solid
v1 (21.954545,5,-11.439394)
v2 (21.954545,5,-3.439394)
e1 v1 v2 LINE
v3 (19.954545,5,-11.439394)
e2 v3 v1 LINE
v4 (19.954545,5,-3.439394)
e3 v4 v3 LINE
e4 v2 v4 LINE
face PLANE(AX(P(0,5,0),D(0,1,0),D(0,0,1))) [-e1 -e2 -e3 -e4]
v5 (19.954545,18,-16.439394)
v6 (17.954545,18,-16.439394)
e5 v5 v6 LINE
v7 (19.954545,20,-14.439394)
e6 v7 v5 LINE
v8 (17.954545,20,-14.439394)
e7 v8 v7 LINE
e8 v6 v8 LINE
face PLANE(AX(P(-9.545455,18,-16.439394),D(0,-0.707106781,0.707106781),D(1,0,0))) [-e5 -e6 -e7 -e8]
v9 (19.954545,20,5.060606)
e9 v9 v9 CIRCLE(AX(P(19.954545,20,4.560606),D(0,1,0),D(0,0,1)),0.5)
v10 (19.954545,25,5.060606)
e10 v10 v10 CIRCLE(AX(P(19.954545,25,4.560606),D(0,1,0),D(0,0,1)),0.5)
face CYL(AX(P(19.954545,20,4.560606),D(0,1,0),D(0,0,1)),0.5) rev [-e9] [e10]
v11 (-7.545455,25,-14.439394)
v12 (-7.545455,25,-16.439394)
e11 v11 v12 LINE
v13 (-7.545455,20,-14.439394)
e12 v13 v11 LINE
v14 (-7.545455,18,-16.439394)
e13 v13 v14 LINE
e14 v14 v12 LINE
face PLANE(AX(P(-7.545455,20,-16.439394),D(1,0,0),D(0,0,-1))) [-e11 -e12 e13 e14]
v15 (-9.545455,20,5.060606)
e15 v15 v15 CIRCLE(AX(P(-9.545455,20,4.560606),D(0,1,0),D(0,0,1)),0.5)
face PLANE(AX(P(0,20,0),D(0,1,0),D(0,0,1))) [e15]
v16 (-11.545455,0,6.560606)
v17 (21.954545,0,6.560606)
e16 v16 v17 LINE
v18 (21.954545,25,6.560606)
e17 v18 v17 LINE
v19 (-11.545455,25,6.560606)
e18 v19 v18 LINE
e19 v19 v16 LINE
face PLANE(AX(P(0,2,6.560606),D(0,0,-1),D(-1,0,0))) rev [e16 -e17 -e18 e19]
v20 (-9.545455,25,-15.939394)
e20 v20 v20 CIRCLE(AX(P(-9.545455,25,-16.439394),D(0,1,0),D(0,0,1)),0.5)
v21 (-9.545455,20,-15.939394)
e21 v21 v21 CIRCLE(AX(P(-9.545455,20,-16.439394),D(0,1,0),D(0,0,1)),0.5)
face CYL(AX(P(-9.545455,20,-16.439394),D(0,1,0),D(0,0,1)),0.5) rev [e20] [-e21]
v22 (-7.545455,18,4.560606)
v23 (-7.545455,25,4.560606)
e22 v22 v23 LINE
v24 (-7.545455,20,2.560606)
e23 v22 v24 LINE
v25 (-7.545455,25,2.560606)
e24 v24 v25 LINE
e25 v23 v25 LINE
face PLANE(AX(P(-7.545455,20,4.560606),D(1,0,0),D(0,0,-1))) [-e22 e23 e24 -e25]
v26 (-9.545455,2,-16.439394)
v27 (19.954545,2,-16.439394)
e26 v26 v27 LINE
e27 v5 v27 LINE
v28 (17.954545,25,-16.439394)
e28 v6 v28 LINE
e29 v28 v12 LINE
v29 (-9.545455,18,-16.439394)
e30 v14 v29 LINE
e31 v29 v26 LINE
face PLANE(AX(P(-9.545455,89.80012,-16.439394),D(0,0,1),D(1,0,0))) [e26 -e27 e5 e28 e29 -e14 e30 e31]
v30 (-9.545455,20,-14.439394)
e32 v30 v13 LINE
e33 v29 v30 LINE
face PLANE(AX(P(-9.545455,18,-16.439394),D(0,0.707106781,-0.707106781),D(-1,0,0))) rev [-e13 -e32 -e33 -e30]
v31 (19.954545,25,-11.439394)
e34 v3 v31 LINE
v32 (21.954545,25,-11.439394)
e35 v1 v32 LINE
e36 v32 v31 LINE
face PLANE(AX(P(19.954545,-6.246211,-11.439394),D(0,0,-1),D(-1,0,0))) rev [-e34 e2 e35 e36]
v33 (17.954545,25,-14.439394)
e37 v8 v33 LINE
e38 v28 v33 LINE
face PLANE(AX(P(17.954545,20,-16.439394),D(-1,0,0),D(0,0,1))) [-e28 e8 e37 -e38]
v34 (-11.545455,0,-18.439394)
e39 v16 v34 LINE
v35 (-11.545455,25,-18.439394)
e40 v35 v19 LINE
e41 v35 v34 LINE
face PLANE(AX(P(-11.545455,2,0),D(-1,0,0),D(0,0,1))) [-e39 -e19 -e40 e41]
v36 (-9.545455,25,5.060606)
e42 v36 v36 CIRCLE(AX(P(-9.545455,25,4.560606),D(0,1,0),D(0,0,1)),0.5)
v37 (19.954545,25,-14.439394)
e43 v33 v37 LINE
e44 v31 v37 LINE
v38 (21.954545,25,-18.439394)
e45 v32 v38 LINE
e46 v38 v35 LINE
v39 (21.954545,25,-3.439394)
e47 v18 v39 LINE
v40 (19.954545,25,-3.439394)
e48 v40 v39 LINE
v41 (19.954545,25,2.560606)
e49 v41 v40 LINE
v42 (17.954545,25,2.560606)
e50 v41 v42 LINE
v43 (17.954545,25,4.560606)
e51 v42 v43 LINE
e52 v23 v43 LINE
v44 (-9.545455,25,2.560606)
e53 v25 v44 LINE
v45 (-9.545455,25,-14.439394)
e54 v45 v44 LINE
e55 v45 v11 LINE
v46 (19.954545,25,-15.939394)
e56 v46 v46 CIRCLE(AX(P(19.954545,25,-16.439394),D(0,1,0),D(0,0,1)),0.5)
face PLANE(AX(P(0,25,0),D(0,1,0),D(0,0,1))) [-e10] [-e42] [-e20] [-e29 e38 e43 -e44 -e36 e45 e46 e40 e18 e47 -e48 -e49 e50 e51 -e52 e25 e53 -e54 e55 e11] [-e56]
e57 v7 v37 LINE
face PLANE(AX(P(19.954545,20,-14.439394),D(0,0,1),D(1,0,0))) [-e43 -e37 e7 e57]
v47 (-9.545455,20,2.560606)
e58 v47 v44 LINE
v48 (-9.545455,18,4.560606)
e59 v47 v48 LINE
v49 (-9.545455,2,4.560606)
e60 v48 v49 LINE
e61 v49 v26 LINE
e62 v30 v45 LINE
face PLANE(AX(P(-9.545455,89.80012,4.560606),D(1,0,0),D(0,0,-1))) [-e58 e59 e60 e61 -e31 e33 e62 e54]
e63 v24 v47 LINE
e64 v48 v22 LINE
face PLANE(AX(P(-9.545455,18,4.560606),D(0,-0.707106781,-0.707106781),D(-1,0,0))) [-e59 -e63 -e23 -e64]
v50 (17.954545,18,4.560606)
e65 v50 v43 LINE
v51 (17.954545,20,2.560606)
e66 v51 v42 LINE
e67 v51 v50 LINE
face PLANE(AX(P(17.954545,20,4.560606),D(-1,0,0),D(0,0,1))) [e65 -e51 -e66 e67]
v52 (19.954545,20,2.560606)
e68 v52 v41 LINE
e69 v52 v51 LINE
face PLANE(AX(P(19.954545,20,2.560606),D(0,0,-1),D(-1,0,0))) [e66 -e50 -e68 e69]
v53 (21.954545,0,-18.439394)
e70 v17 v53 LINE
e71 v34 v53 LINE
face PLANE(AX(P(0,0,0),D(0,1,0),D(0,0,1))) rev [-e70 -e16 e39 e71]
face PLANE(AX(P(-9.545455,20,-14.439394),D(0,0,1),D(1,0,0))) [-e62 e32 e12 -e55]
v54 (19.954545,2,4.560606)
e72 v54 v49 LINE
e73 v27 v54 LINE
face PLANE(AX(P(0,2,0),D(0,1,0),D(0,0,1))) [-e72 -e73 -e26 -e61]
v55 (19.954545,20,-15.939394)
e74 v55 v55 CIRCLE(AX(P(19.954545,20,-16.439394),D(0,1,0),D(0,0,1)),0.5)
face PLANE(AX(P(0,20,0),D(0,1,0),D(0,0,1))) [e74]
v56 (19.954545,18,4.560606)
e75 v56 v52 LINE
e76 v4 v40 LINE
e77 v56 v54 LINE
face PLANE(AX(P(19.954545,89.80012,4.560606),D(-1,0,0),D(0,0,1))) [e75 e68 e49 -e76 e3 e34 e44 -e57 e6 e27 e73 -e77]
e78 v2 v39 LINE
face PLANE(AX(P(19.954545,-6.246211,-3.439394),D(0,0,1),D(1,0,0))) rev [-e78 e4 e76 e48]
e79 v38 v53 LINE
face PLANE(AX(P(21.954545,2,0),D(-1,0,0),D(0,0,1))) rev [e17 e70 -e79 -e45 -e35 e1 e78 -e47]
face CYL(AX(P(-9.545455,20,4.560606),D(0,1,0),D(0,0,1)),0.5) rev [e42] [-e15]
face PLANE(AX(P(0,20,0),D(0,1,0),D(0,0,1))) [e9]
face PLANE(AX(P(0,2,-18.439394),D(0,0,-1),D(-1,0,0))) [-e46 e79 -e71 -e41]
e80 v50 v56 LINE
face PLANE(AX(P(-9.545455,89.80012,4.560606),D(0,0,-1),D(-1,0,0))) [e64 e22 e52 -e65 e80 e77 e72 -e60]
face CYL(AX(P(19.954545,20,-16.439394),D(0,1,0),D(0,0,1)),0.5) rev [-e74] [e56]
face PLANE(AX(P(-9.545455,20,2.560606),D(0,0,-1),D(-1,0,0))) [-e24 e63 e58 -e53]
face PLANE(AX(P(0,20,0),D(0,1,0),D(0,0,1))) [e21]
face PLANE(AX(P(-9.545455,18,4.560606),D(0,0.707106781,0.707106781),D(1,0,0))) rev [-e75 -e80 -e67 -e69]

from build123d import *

# Parameters (mm, degrees)
SKETCH1_W           = 33.5
SKETCH1_H           = 25
SKETCH1_W_2         = 29.5
SKETCH1_H_2         = 21
BOSS_EXTRUDE1_DEPTH = 2
SKETCH1_3_W         = 33.5
SKETCH1_3_H         = 25
SKETCH1_3_W_2       = 29.5
SKETCH1_3_H_2       = 21
BOSS_EXTRUDE2_DEPTH = 25
SKETCH2_W           = 2
SKETCH2_H           = 8
CUT_EXTRUDE1_DEPTH  = 20
SKETCH3_W           = 2
SKETCH3_H           = 2
BOSS_EXTRUDE3_DEPTH = 5
CHAMFER1_SIZE       = 2
CUT_EXTRUDE2_DEPTH  = 5


with BuildPart() as part:
    # Sketch1 → Boss-Extrude1 (new body)
    # profile 1 of 2: a face of its own
    with BuildSketch(Plane(origin=(0, 0, 0), x_dir=(1, 0, 0), z_dir=(0, 1, 0))):
        with Locations((5.204545455, 5.939393939)):
            Rectangle(SKETCH1_W, SKETCH1_H)
        with Locations((5.204545455, 5.939393939)):
            Rectangle(SKETCH1_W_2, SKETCH1_H_2, mode=Mode.SUBTRACT)
    # profile 2 of 2: a face of its own
    with BuildSketch(Plane(origin=(0, 0, 0), x_dir=(1, 0, 0), z_dir=(0, 1, 0))):
        with Locations((5.204545455, 5.939393939)):
            Rectangle(SKETCH1_W_2, SKETCH1_H_2)
    extrude(amount=BOSS_EXTRUDE1_DEPTH)

    # Sketch1<3> → Boss-Extrude2 (add)
    with BuildSketch(Plane(origin=(0, 0, 0), x_dir=(1, 0, 0), z_dir=(0, 1, 0))):
        with Locations((5.204545455, 5.939393939)):
            Rectangle(SKETCH1_3_W, SKETCH1_3_H)
        with Locations((5.204545455, 5.939393939)):
            Rectangle(SKETCH1_3_W_2, SKETCH1_3_H_2, mode=Mode.SUBTRACT)
    extrude(amount=BOSS_EXTRUDE2_DEPTH)

    # Sketch2 → Cut-Extrude1 (cut)
    with BuildSketch(Plane(origin=(0, 25, 0), x_dir=(1, 0, 0), z_dir=(0, 1, 0))):
        with Locations((20.954545455, 7.439393939)):
            Rectangle(SKETCH2_W, SKETCH2_H)
    extrude(amount=-CUT_EXTRUDE1_DEPTH, mode=Mode.SUBTRACT)

    # Sketch3 → Boss-Extrude3 (add)
    with BuildSketch(Plane(origin=(0, 25, 0), x_dir=(1, 0, 0), z_dir=(0, 1, 0))):
        with Locations((-8.545454545, 15.439393939)):
            Rectangle(SKETCH3_W, SKETCH3_H)
        with Locations((-8.545454545, -3.560606061)):
            Rectangle(SKETCH3_W, SKETCH3_H)
        with Locations((18.954545455, -3.560606061)):
            Rectangle(SKETCH3_W, SKETCH3_H)
        with Locations((18.954545455, 15.439393939)):
            Rectangle(SKETCH3_W, SKETCH3_H)
    extrude(amount=-BOSS_EXTRUDE3_DEPTH)

    # Chamfer1
    chamfer1_edges = [part.edges().sort_by_distance(p)[0] for p in [
        (18.954545455, 20, 4.560606061),
        (-8.545454545, 20, 4.560606061),
        (18.954545455, 20, -16.439393939),
        (-8.545454545, 20, -16.439393939),
    ]]
    chamfer(chamfer1_edges, length=CHAMFER1_SIZE - 0.0001)  # a hair under: the kernel refuses the full size

    # Sketch4 → Cut-Extrude2 (cut)
    with BuildSketch(Plane(origin=(0, 25, 0), x_dir=(1, 0, 0), z_dir=(0, 1, 0))):
        with BuildLine():
            ThreePointArc((20.454545455, -4.560606061), (20.308098845, -4.20705267), (19.954545455, -4.060606061))
            Line((19.954545455, -4.060606061), (19.954545455, -4.560606061))
            Line((19.954545455, -4.560606061), (19.454545455, -4.560606061))
            ThreePointArc((19.454545455, -4.560606061), (19.954545455, -5.060606061), (20.454545455, -4.560606061))
        make_face()
        with BuildLine():
            Line((19.954545455, -4.560606061), (19.954545455, -4.060606061))
            ThreePointArc((19.954545455, -4.060606061), (19.600992064, -4.20705267), (19.454545455, -4.560606061))
            Line((19.454545455, -4.560606061), (19.954545455, -4.560606061))
        make_face()
        with BuildLine():
            ThreePointArc((20.454545455, -4.560606061), (20.308098845, -4.20705267), (19.954545455, -4.060606061))
            Line((19.954545455, -4.060606061), (19.954545455, -4.560606061))
            Line((19.954545455, -4.560606061), (19.454545455, -4.560606061))
            ThreePointArc((19.454545455, -4.560606061), (19.954545455, -5.060606061), (20.454545455, -4.560606061))
        make_face()
        with BuildLine():
            Line((19.954545455, -4.560606061), (19.954545455, -4.060606061))
            ThreePointArc((19.954545455, -4.060606061), (19.600992064, -4.20705267), (19.454545455, -4.560606061))
            Line((19.454545455, -4.560606061), (19.954545455, -4.560606061))
        make_face()
        with BuildLine():
            ThreePointArc((20.454545455, 16.439393939), (19.954545455, 16.939393939), (19.454545455, 16.439393939))
            Line((19.454545455, 16.439393939), (19.954545455, 16.439393939))
            Line((19.954545455, 16.439393939), (19.954545455, 15.939393939))
            ThreePointArc((19.954545455, 15.939393939), (20.308098845, 16.085840549), (20.454545455, 16.439393939))
        make_face()
        with BuildLine():
            Line((19.954545455, 16.439393939), (19.454545455, 16.439393939))
            ThreePointArc((19.454545455, 16.439393939), (19.600992064, 16.085840549), (19.954545455, 15.939393939))
            Line((19.954545455, 15.939393939), (19.954545455, 16.439393939))
        make_face()
        with BuildLine():
            ThreePointArc((20.454545455, 16.439393939), (19.954545455, 16.939393939), (19.454545455, 16.439393939))
            Line((19.454545455, 16.439393939), (19.954545455, 16.439393939))
            Line((19.954545455, 16.439393939), (19.954545455, 15.939393939))
            ThreePointArc((19.954545455, 15.939393939), (20.308098845, 16.085840549), (20.454545455, 16.439393939))
        make_face()
        with BuildLine():
            Line((19.954545455, 16.439393939), (19.454545455, 16.439393939))
            ThreePointArc((19.454545455, 16.439393939), (19.600992064, 16.085840549), (19.954545455, 15.939393939))
            Line((19.954545455, 15.939393939), (19.954545455, 16.439393939))
        make_face()
        with BuildLine():
            ThreePointArc((-9.545454545, 15.939393939), (-9.191901155, 16.085840549), (-9.045454545, 16.439393939))
            Line((-9.045454545, 16.439393939), (-9.545454545, 16.439393939))
            Line((-9.545454545, 16.439393939), (-9.545454545, 15.939393939))
        make_face()
        with BuildLine():
            Line((-9.545454545, 16.439393939), (-9.045454545, 16.439393939))
            ThreePointArc((-9.045454545, 16.439393939), (-9.899007936, 16.79294733), (-9.545454545, 15.939393939))
            Line((-9.545454545, 15.939393939), (-9.545454545, 16.439393939))
        make_face()
        with BuildLine():
            ThreePointArc((-9.545454545, 15.939393939), (-9.191901155, 16.085840549), (-9.045454545, 16.439393939))
            Line((-9.045454545, 16.439393939), (-9.545454545, 16.439393939))
            Line((-9.545454545, 16.439393939), (-9.545454545, 15.939393939))
        make_face()
        with BuildLine():
            Line((-9.545454545, 16.439393939), (-9.045454545, 16.439393939))
            ThreePointArc((-9.045454545, 16.439393939), (-9.899007936, 16.79294733), (-9.545454545, 15.939393939))
            Line((-9.545454545, 15.939393939), (-9.545454545, 16.439393939))
        make_face()
        with BuildLine():
            ThreePointArc((-9.045454545, -4.560606061), (-9.191901155, -4.20705267), (-9.545454545, -4.060606061))
            Line((-9.545454545, -4.060606061), (-9.545454545, -4.560606061))
            Line((-9.545454545, -4.560606061), (-9.045454545, -4.560606061))
        make_face()
        with BuildLine():
            Line((-9.545454545, -4.560606061), (-9.545454545, -4.060606061))
            ThreePointArc((-9.545454545, -4.060606061), (-9.899007936, -4.914159451), (-9.045454545, -4.560606061))
            Line((-9.045454545, -4.560606061), (-9.545454545, -4.560606061))
        make_face()
        with BuildLine():
            ThreePointArc((-9.045454545, -4.560606061), (-9.191901155, -4.20705267), (-9.545454545, -4.060606061))
            Line((-9.545454545, -4.060606061), (-9.545454545, -4.560606061))
            Line((-9.545454545, -4.560606061), (-9.045454545, -4.560606061))
        make_face()
        with BuildLine():
            Line((-9.545454545, -4.560606061), (-9.545454545, -4.060606061))
            ThreePointArc((-9.545454545, -4.060606061), (-9.899007936, -4.914159451), (-9.045454545, -4.560606061))
            Line((-9.045454545, -4.560606061), (-9.545454545, -4.560606061))
        make_face()
    extrude(amount=-CUT_EXTRUDE2_DEPTH, mode=Mode.SUBTRACT)


solid = part.part
